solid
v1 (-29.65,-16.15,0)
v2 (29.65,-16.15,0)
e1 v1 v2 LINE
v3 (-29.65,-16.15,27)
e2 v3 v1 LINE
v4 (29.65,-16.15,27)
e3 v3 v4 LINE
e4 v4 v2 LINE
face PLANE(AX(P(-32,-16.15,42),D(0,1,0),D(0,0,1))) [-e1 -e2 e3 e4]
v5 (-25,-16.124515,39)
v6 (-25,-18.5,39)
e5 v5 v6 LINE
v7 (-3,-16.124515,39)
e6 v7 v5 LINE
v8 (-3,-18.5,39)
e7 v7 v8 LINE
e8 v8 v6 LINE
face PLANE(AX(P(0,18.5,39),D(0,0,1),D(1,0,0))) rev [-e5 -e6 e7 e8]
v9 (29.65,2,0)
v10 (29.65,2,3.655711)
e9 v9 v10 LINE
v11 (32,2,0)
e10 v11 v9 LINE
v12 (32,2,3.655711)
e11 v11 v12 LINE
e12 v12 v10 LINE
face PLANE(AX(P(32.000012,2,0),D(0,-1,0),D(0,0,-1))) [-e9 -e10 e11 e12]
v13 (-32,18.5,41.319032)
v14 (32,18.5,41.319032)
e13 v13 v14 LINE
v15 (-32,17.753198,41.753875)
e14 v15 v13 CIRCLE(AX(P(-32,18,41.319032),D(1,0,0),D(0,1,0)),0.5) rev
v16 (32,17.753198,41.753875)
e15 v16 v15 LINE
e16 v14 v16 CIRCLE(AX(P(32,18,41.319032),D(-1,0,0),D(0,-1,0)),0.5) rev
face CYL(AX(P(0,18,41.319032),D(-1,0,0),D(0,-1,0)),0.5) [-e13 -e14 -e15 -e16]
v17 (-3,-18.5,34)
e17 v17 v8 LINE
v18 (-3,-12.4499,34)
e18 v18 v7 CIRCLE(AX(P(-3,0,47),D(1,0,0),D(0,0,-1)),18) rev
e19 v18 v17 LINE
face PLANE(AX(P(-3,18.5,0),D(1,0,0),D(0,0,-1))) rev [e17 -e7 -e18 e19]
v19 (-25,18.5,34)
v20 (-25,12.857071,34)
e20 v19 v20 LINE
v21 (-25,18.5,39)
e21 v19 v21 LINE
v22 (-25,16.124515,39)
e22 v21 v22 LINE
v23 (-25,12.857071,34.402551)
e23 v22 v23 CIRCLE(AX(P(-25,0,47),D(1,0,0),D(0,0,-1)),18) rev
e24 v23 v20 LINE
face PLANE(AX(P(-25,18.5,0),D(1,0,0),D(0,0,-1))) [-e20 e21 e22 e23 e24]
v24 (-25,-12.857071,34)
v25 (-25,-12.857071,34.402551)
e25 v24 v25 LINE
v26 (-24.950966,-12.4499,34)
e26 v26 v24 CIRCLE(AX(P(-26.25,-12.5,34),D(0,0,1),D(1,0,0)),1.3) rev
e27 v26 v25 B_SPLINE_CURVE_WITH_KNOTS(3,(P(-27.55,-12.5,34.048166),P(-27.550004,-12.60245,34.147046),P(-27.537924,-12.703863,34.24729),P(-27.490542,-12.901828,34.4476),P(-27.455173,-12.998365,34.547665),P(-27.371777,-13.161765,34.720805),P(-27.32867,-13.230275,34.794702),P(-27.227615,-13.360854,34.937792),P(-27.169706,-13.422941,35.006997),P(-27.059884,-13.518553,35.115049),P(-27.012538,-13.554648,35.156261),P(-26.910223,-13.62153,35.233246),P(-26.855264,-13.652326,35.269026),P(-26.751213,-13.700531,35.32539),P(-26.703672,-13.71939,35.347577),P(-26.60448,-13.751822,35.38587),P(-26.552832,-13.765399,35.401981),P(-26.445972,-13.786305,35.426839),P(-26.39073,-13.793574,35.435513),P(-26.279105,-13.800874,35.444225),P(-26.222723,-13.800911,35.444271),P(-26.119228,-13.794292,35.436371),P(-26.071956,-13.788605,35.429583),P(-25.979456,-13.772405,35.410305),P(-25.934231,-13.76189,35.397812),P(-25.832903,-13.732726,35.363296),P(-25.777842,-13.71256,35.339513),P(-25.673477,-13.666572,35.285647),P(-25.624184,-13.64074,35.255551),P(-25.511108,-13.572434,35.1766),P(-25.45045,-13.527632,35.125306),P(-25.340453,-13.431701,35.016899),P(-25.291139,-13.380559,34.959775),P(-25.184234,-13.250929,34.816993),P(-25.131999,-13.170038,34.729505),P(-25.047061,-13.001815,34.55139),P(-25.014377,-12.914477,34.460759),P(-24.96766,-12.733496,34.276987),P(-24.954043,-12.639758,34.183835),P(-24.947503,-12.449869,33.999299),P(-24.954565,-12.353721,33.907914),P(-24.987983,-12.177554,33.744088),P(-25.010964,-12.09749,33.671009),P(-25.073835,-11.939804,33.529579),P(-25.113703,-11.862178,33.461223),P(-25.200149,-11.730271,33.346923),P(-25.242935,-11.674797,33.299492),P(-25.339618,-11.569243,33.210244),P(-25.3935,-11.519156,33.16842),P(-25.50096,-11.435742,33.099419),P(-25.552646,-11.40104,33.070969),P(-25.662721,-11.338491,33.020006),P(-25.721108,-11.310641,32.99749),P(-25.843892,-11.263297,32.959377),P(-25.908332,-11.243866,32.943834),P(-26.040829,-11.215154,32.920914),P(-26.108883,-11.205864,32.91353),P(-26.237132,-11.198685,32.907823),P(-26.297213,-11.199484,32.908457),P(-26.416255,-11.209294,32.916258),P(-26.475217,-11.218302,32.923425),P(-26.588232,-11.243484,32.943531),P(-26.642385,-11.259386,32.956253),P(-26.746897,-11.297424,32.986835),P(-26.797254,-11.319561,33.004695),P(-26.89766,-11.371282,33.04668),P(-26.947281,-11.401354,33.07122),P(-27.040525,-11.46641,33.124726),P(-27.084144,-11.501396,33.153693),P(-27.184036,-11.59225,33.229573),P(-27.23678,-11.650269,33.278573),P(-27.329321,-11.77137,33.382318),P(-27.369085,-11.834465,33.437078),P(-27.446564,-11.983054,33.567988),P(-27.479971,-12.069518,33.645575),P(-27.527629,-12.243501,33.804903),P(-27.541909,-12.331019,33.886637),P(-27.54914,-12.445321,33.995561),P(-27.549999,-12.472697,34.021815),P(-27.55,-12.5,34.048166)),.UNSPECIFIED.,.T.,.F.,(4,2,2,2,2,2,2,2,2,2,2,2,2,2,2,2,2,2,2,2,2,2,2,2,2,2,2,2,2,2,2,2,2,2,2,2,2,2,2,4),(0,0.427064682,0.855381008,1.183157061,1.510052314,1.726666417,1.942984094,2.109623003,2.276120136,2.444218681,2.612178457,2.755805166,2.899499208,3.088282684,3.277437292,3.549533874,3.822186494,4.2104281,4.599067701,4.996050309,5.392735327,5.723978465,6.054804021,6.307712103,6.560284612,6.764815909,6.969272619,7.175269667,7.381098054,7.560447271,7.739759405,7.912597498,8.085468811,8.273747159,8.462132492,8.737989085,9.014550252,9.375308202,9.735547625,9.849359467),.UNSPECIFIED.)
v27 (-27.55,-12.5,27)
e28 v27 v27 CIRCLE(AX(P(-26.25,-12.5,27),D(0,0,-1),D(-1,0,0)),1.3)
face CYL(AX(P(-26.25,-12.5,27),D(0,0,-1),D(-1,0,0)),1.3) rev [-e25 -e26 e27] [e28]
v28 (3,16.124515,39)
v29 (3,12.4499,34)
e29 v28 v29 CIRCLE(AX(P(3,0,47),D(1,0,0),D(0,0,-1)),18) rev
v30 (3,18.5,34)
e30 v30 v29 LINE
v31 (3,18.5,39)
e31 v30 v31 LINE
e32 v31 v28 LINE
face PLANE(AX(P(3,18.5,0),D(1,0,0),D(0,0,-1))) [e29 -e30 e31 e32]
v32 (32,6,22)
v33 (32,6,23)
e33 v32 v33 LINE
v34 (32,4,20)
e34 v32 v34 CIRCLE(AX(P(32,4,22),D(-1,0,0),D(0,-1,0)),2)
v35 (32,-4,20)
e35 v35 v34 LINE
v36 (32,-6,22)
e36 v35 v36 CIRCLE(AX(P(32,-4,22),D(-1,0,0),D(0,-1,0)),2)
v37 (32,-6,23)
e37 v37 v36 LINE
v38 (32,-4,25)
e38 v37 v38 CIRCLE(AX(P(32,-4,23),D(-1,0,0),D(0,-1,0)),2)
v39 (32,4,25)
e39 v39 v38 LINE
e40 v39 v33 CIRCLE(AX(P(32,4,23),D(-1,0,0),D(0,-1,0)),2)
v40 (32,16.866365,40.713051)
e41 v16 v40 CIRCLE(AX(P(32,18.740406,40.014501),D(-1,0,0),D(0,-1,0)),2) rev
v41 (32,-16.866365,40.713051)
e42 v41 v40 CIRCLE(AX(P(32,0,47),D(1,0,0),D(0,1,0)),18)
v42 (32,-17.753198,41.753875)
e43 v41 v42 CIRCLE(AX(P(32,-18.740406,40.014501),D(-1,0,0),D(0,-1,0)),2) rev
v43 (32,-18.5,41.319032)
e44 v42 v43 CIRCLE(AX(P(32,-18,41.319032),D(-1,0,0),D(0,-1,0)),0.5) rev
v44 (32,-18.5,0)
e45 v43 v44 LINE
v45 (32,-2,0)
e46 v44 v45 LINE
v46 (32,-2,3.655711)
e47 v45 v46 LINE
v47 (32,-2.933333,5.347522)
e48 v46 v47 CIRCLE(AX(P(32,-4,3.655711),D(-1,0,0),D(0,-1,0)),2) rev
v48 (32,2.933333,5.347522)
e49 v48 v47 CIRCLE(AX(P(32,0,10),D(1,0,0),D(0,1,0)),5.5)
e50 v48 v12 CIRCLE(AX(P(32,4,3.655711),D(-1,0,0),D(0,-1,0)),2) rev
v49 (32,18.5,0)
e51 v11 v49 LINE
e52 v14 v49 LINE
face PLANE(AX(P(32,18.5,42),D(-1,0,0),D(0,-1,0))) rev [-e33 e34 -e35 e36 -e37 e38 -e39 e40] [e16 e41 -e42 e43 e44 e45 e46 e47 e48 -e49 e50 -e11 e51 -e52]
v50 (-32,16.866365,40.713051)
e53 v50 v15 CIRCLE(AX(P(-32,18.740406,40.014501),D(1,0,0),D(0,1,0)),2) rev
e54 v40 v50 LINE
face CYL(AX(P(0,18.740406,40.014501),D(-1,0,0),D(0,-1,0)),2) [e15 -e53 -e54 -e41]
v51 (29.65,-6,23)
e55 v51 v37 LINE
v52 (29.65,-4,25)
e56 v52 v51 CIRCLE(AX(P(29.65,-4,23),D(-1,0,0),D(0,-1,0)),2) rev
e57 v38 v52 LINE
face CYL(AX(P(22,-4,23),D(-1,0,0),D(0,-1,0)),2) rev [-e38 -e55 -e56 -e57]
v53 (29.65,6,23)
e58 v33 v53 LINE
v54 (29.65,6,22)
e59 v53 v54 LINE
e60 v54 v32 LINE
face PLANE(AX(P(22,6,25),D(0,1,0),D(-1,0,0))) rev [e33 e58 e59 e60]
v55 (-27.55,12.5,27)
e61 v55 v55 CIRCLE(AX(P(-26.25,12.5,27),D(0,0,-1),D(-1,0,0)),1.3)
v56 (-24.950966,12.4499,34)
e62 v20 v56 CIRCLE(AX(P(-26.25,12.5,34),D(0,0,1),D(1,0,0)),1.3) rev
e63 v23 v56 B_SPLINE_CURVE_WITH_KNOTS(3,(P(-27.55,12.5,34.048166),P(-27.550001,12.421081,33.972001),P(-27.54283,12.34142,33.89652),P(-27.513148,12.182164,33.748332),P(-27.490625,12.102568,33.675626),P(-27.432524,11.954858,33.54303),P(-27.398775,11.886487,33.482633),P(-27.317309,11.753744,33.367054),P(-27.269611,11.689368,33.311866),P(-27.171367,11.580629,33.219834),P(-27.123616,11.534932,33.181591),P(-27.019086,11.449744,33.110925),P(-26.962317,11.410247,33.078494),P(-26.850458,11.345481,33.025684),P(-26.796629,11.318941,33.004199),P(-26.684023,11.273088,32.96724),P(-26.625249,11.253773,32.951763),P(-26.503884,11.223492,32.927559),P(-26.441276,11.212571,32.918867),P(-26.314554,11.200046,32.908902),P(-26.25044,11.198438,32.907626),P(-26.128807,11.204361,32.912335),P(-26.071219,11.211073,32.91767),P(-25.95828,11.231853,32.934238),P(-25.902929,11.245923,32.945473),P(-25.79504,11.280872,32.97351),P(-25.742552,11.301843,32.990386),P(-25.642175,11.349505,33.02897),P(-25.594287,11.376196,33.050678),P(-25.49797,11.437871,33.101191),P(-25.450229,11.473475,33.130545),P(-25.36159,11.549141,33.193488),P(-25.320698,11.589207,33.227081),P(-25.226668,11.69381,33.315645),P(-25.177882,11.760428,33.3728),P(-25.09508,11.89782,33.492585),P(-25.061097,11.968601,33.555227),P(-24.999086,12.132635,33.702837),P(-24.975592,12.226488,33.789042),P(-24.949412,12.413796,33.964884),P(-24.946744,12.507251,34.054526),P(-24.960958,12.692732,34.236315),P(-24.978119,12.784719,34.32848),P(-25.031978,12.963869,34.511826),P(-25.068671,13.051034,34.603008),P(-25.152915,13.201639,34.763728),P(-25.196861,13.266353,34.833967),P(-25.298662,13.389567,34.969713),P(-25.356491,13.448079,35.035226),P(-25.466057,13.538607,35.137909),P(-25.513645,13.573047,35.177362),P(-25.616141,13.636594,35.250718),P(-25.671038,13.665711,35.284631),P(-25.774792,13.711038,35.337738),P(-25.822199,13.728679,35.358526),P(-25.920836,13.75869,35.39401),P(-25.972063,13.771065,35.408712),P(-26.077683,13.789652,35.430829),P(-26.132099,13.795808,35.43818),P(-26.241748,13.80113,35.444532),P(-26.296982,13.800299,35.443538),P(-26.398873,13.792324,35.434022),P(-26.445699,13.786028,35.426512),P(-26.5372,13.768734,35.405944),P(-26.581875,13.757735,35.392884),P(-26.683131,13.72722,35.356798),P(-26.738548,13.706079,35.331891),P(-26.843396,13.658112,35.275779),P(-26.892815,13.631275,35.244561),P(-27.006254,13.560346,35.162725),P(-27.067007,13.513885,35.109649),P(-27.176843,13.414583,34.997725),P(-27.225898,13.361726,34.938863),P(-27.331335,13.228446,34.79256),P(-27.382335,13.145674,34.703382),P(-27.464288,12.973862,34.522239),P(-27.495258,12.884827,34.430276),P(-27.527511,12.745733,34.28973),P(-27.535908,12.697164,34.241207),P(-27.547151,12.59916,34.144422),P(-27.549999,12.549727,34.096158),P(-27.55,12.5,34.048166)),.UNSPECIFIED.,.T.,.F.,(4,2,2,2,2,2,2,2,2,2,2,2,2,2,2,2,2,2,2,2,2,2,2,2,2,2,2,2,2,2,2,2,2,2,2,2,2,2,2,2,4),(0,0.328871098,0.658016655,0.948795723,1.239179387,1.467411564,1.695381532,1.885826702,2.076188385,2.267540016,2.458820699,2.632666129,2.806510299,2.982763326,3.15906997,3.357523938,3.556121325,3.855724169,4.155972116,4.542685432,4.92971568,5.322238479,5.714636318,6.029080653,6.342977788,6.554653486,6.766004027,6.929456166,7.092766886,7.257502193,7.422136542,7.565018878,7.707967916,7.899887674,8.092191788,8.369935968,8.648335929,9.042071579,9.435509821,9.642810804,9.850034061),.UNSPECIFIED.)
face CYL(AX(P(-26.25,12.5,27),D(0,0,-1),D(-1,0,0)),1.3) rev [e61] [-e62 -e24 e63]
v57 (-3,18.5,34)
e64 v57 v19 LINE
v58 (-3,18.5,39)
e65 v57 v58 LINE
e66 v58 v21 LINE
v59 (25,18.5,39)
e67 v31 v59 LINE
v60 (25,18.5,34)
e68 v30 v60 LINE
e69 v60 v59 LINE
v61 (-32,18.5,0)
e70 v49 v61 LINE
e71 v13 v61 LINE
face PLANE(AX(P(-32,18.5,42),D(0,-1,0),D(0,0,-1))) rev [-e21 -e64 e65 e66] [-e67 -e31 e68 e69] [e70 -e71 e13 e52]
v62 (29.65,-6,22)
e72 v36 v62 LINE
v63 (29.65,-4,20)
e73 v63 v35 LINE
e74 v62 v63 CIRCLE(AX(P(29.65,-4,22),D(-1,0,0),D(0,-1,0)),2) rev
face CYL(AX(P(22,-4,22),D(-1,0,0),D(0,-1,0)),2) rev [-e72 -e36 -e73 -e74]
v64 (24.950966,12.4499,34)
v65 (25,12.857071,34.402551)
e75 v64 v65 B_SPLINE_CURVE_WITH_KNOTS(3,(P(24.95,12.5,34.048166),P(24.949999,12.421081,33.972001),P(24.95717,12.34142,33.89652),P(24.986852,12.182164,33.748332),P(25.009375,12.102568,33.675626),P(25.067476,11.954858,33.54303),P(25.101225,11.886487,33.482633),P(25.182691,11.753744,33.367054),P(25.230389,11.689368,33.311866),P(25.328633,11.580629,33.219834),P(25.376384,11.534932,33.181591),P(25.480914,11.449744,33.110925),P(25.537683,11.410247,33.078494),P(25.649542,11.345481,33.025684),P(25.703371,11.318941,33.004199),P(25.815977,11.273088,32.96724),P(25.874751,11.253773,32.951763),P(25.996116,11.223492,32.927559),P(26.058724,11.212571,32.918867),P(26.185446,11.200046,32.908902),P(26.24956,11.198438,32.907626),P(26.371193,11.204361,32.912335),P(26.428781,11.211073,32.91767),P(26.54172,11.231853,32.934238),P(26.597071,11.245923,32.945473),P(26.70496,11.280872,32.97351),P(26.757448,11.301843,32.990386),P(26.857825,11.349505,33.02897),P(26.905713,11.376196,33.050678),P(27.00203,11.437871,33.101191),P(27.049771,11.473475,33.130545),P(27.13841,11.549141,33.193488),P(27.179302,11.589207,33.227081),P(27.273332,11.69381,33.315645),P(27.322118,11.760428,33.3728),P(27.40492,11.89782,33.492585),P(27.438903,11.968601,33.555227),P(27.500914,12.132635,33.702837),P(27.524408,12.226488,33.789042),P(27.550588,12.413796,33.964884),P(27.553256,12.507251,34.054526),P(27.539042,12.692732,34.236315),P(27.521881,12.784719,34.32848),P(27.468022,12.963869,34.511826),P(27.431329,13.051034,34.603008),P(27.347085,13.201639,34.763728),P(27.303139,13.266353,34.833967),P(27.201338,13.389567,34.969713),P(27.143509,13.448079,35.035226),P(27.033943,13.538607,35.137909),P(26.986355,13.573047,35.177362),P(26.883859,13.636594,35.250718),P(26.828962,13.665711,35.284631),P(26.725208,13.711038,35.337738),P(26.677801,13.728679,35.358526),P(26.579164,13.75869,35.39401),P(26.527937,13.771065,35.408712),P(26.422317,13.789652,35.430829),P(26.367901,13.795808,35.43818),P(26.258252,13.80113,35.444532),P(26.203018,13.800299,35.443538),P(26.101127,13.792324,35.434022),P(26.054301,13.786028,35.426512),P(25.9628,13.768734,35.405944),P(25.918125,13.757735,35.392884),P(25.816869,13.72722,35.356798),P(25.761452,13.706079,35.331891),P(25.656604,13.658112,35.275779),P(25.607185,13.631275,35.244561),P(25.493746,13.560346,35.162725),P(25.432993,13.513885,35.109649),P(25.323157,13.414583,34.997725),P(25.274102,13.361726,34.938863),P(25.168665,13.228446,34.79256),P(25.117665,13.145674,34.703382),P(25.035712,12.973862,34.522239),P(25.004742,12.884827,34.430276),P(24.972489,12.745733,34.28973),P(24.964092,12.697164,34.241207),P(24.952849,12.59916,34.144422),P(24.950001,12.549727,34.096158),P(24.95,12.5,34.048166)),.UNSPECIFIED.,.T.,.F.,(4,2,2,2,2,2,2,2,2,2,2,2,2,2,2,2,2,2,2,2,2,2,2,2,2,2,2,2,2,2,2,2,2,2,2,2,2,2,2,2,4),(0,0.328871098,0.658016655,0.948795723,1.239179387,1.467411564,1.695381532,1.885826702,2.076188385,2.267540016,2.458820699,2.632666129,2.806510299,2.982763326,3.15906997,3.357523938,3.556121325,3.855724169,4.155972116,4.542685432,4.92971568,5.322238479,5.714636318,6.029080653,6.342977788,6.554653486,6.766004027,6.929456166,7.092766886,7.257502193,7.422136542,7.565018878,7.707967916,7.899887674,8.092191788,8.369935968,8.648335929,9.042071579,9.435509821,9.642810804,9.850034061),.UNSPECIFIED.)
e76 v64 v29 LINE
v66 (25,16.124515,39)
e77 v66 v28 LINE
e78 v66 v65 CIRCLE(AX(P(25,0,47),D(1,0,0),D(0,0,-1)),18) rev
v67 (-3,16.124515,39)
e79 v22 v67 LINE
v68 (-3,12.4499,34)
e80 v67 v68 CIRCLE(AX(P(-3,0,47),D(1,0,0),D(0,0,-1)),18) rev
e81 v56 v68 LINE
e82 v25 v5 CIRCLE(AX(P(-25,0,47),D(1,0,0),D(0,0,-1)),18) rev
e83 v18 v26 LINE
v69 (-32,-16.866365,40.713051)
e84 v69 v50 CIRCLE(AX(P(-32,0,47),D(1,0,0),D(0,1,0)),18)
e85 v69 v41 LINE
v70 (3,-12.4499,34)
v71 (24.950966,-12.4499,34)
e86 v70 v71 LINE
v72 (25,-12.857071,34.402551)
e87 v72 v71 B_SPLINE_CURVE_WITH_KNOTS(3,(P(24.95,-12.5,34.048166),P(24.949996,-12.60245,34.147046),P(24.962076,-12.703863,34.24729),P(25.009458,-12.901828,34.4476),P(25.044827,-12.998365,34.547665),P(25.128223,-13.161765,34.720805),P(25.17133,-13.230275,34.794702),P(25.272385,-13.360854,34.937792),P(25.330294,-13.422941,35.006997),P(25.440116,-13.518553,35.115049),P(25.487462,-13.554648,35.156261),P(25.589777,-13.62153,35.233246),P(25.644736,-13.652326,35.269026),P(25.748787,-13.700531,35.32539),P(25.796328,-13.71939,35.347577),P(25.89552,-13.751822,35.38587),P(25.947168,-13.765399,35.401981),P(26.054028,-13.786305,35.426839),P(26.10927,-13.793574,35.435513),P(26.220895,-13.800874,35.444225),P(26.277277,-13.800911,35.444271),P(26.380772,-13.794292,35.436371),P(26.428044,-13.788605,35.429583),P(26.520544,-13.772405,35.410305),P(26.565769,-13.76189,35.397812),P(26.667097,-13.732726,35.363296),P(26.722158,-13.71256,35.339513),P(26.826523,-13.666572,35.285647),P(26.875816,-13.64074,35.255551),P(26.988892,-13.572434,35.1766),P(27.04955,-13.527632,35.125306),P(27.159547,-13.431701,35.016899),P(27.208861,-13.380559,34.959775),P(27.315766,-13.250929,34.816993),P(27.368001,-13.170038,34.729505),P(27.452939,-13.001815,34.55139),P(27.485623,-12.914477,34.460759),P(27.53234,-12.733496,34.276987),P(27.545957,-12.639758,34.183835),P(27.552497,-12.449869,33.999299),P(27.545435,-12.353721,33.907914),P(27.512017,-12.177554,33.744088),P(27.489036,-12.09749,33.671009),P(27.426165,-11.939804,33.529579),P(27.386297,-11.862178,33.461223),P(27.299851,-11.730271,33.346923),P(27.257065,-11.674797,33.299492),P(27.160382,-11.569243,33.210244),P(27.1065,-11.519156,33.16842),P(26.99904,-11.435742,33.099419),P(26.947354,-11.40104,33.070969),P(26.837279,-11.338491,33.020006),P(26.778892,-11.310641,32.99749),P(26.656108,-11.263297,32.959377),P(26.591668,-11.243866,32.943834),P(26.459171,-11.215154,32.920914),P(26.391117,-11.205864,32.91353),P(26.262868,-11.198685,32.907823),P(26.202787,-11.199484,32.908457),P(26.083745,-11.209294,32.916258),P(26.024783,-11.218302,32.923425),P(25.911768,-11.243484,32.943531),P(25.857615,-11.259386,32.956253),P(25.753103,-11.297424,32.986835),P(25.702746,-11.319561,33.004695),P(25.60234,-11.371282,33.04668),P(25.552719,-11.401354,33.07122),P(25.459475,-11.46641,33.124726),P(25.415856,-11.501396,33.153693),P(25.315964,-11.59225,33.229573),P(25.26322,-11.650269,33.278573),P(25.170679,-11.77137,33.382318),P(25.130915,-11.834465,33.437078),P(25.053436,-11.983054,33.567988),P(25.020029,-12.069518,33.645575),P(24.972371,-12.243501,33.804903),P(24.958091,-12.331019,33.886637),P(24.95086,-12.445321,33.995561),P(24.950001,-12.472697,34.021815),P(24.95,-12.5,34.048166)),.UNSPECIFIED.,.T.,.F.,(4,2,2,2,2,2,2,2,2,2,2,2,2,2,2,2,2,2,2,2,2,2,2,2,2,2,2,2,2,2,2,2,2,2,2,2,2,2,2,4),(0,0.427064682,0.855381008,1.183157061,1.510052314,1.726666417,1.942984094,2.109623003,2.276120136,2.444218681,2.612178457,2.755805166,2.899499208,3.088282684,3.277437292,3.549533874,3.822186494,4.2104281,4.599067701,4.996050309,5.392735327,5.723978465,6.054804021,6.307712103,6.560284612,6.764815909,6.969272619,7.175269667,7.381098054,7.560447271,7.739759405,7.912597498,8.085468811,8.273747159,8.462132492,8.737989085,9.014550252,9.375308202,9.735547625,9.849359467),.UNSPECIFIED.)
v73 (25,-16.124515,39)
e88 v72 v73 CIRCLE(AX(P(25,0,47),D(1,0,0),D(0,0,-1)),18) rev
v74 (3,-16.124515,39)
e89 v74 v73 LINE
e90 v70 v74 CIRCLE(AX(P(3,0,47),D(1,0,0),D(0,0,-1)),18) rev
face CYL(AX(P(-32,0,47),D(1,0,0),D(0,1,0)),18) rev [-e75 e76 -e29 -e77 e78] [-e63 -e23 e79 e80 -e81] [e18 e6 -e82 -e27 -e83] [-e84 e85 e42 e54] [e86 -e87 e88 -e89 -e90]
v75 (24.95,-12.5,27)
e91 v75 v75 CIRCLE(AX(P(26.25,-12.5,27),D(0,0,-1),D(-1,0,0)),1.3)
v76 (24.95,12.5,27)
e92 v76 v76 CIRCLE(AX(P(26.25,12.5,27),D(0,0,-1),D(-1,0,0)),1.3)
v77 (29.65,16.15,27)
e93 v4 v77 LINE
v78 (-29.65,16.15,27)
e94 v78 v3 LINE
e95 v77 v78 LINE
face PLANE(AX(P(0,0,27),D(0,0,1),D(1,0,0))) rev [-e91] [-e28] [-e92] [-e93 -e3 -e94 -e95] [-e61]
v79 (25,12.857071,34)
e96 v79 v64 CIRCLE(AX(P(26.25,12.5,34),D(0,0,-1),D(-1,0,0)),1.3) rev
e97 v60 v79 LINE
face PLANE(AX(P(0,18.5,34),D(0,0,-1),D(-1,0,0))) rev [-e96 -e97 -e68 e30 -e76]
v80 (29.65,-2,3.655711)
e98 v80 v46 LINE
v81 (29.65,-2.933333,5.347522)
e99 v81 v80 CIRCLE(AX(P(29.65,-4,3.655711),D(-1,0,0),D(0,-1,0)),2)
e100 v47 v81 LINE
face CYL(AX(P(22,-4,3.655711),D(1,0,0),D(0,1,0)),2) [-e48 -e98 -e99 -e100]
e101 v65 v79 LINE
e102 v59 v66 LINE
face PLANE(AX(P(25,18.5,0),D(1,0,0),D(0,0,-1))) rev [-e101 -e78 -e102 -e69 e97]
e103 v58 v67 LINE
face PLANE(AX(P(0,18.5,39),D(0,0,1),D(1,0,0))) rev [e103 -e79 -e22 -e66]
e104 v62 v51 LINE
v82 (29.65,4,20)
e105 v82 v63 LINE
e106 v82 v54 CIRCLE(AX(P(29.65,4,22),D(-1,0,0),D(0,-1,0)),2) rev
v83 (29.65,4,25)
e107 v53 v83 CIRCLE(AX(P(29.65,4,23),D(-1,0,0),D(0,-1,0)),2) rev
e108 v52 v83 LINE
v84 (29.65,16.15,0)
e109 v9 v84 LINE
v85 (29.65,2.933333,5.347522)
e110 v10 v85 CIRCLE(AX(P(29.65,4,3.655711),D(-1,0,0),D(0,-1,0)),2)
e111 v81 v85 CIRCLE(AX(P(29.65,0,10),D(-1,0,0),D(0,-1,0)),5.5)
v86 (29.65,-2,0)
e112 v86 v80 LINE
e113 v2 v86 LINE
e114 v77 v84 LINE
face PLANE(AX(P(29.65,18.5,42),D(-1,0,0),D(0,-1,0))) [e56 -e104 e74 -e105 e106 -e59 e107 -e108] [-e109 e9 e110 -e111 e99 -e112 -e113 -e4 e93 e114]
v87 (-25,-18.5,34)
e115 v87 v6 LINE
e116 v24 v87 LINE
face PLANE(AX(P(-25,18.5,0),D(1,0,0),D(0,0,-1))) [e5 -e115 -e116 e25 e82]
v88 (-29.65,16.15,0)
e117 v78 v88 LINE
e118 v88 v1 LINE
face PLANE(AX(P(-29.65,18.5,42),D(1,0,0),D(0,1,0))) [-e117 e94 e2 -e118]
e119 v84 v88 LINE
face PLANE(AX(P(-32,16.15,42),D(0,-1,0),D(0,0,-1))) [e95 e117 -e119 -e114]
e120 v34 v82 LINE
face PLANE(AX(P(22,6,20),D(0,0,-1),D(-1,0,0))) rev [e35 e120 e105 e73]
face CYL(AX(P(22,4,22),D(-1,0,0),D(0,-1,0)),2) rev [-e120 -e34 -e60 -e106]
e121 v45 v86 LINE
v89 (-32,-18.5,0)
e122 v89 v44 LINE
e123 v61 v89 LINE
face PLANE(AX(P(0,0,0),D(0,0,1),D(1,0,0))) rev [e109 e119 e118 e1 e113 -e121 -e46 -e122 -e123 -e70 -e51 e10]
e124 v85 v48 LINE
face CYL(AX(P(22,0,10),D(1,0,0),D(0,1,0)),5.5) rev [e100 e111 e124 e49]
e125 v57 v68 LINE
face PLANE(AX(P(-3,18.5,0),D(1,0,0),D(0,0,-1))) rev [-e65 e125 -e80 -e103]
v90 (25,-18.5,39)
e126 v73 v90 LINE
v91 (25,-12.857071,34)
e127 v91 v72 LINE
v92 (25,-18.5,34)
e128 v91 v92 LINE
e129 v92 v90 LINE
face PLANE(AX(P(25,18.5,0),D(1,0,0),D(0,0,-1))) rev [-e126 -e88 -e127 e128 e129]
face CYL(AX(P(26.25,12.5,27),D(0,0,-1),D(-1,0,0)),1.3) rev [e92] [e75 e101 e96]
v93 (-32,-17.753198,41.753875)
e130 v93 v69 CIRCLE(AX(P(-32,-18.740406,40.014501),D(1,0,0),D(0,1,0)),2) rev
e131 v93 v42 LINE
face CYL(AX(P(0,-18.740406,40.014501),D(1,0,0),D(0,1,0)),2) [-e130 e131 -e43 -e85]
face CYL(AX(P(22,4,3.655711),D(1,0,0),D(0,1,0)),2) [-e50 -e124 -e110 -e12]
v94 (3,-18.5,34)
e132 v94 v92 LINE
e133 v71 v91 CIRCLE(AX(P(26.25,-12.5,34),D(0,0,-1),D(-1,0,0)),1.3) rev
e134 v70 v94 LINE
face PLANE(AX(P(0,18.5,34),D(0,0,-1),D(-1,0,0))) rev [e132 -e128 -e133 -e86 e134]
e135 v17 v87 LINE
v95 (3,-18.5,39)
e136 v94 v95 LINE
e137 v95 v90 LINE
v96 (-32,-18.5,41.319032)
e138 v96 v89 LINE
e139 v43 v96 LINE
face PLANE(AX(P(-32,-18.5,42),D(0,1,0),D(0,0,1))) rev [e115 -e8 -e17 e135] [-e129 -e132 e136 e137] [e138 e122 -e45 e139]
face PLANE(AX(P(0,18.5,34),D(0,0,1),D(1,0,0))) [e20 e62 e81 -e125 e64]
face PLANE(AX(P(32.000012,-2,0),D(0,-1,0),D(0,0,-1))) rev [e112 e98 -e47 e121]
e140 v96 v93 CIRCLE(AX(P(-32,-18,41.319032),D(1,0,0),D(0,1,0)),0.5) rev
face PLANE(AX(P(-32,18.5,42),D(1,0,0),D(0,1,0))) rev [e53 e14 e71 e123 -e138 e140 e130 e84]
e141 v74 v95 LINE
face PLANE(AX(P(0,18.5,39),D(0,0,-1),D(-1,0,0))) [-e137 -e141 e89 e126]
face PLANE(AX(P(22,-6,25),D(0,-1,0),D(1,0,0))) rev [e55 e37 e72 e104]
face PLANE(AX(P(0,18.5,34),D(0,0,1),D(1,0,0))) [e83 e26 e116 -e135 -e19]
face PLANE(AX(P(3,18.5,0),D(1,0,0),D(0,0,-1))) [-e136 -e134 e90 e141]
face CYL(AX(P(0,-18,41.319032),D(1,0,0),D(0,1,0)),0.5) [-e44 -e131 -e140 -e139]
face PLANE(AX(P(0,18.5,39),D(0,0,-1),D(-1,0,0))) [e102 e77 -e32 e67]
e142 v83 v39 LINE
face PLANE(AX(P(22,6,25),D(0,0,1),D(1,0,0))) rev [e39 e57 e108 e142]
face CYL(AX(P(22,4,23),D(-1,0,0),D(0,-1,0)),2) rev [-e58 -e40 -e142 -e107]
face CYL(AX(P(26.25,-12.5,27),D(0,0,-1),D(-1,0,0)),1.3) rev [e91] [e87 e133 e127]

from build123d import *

# Parameters (mm, degrees)
SKETCH_1_W                 = 64
SKETCH_1_H                 = 37
EXTRUDE_1_DEPTH            = 42
SHELL_1_T                  = -2.35
SHELL_1_THICKNESS_2_FACE_W = 59.3
SHELL_1_THICKNESS_2_FACE_H = 32.3
SHELL_1_THICKNESS_2_DEPTH  = 12.65
F_3_0MM_START              = 27
F_3_0MM_1_OUTLINE_R        = 1.3
F_3_0MM_1_DEPTH            = 15
SKETCH_4_R                 = 18
CUT_EXTRUDE_1_DEPTH        = 79.754364958
SKETCH_5_W                 = 22
SKETCH_5_H                 = 5
CUT_EXTRUDE_2_DEPTH        = 65.474801394
SKETCH_6_R                 = 5.5
SKETCH_6_W                 = 5
SKETCH_6_H                 = 12
CUT_EXTRUDE_3_DEPTH        = 10
CUT_EXTRUDE_1_2_DEPTH      = 79.754365093
CUT_EXTRUDE_1_2_DEPTH_BACK = 10
SKETCH_7_W                 = 5
SKETCH_7_H                 = 4
FILLET_1_R                 = 2
FILLET_2_R                 = 2
FILLET_3_R                 = 0.5


# Read off the part's stored shape, not the designer's step: Ø3.0mm 暗销孔1
with BuildPart() as part:
    # 草图1 → 凸台-拉伸1 (new body)
    with BuildSketch(Plane.XY):
        Rectangle(SKETCH_1_W, SKETCH_1_H)
    extrude(amount=EXTRUDE_1_DEPTH)

    # 抽壳1
    shell_1_openings = [part.faces().sort_by_distance(p)[0] for p in [
        (0, 0, 0),
    ]]
    offset(amount=SHELL_1_T, openings=shell_1_openings, kind=Kind.INTERSECTION)

    # 抽壳1 thickness 2 face (on inner face of the shell) → 抽壳1 thickness 2 (add)
    with BuildSketch(Plane.XY.offset(39.65)):
        Rectangle(SHELL_1_THICKNESS_2_FACE_W, SHELL_1_THICKNESS_2_FACE_H)
    extrude(amount=-SHELL_1_THICKNESS_2_DEPTH)

    # Ø3.0mm 暗销孔1 outline → Ø3.0mm 暗销孔1 (cut)
    with BuildSketch(Plane.XY.offset(F_3_0MM_START)):
        with Locations((26.25, -12.5)):
            Circle(F_3_0MM_1_OUTLINE_R)
        with Locations((-26.25, 12.5)):
            Circle(F_3_0MM_1_OUTLINE_R)
        with Locations((-26.25, -12.5)):
            Circle(F_3_0MM_1_OUTLINE_R)
        with Locations((26.25, 12.5)):
            Circle(F_3_0MM_1_OUTLINE_R)
    extrude(amount=F_3_0MM_1_DEPTH, mode=Mode.SUBTRACT)

    # 草图4 → Cut-Extrude 1 (cut, through all)
    with BuildSketch(Plane(origin=(32, 0, 0), x_dir=(0, 0, -1), z_dir=(1, 0, 0))):
        with Locations((-47, 0)):
            Circle(SKETCH_4_R)
    extrude(amount=-CUT_EXTRUDE_1_DEPTH, mode=Mode.SUBTRACT)

    # 草图5 → 切除-拉伸2 (cut, through all)
    with BuildSketch(Plane.XZ.offset(18.5)):
        with Locations((14, 36.5)):
            Rectangle(SKETCH_5_W, SKETCH_5_H)
        with Locations((-14, 36.5)):
            Rectangle(SKETCH_5_W, SKETCH_5_H)
    extrude(amount=-CUT_EXTRUDE_2_DEPTH, mode=Mode.SUBTRACT)

    # 草图6 → 切除-拉伸3 (cut)
    with BuildSketch(Plane(origin=(32, 0, 0), x_dir=(0, 0, -1), z_dir=(1, 0, 0))):
        with Locations(Location((-10, 0, 0), (0, 0, 90))):
            Circle(SKETCH_6_R)
        with Locations((-22.5, 0)):
            Rectangle(SKETCH_6_W, SKETCH_6_H)
    extrude(amount=-CUT_EXTRUDE_3_DEPTH, mode=Mode.SUBTRACT)

    # 草图7 → Cut-Extrude 1 2 (cut, two sides: drawn at the far end of the back side and taken through both)
    with BuildSketch(Plane(origin=(32, 0, 0), x_dir=(0, 0, -1), z_dir=(1, 0, 0)).offset(-CUT_EXTRUDE_1_2_DEPTH_BACK)):
        with Locations((-2.5, 0)):
            Rectangle(SKETCH_7_W, SKETCH_7_H)
    extrude(amount=CUT_EXTRUDE_1_2_DEPTH + CUT_EXTRUDE_1_2_DEPTH_BACK, mode=Mode.SUBTRACT)

    # 圆角1
    fillet_1_edges = [part.edges().sort_by_distance(p)[0] for p in [
        (30.825, -6, 25),
        (30.825, 6, 25),
        (30.825, 6, 20),
        (30.825, -6, 20),
        (30.825, -2, 4.876524617),
        (30.825, 2, 4.876524617),
    ]]
    fillet(fillet_1_edges, radius=FILLET_1_R)

    # 圆角2
    # the kernel refuses this fillet: 2 mm, written as the material it takes off along each edge
    with BuildSketch(Plane(origin=(-35.388469359, -17.291616466, 42), x_dir=(0, -1.0, -4.0690356929386436e-12), z_dir=(1, 0, 0))) as fillet_2_piece_1:
        with BuildLine():
            CenterArc((1.448789292, 1.985498696), FILLET_2_R, 200.442973307, 62.653215254)
            Line((-0.425251284, 1.286948826), (-0.462732095, 1.272977829))
            ThreePointArc((-0.462732095, 1.272977829), (-0.238488291, 0.634928522), (-0.038425814, -0.011111111))
            Line((-0.038425814, -0.011111111), (0, -0.04))
            ThreePointArc((0, -0.04), (0.604191767, -0.04), (1.203575419, -0.039709974))
            Line((1.203575419, -0.039709974), (1.208383534, 0))
        make_face()
    extrude(amount=70.776938719, mode=Mode.SUBTRACT)
    with BuildSketch(Plane(origin=(-35.388469359, 17.291616466, 42), x_dir=(0, -0.31374880411831046, -0.9495060231058727), z_dir=(1, 0, 0))) as fillet_2_piece_2:
        with BuildLine():
            CenterArc((1.430687063, 1.998582), FILLET_2_R, 205.189108199, 62.653215254)
            Line((-0.379128889, 1.147367444), (-0.415325208, 1.130343153))
            ThreePointArc((-0.415325208, 1.130343153), (-0.227544685, 0.56113377), (-0.037980241, -0.012549952))
            Line((-0.037980241, -0.012549952), (0.001505986, -0.03997164))
            ThreePointArc((0.001505986, -0.03997164), (0.677693872, -0.027238004), (1.353881757, -0.03997164))
            Line((1.353881757, -0.03997164), (1.355387744, 0))
        make_face()
    extrude(amount=70.776938719, mode=Mode.SUBTRACT)

    # 圆角3
    fillet_3_edges = [part.edges().sort_by_distance(p)[0] for p in [
        (0, -18.5, 42),
        (0, 18.5, 42),
    ]]
    fillet(fillet_3_edges, radius=FILLET_3_R)


solid = part.part
